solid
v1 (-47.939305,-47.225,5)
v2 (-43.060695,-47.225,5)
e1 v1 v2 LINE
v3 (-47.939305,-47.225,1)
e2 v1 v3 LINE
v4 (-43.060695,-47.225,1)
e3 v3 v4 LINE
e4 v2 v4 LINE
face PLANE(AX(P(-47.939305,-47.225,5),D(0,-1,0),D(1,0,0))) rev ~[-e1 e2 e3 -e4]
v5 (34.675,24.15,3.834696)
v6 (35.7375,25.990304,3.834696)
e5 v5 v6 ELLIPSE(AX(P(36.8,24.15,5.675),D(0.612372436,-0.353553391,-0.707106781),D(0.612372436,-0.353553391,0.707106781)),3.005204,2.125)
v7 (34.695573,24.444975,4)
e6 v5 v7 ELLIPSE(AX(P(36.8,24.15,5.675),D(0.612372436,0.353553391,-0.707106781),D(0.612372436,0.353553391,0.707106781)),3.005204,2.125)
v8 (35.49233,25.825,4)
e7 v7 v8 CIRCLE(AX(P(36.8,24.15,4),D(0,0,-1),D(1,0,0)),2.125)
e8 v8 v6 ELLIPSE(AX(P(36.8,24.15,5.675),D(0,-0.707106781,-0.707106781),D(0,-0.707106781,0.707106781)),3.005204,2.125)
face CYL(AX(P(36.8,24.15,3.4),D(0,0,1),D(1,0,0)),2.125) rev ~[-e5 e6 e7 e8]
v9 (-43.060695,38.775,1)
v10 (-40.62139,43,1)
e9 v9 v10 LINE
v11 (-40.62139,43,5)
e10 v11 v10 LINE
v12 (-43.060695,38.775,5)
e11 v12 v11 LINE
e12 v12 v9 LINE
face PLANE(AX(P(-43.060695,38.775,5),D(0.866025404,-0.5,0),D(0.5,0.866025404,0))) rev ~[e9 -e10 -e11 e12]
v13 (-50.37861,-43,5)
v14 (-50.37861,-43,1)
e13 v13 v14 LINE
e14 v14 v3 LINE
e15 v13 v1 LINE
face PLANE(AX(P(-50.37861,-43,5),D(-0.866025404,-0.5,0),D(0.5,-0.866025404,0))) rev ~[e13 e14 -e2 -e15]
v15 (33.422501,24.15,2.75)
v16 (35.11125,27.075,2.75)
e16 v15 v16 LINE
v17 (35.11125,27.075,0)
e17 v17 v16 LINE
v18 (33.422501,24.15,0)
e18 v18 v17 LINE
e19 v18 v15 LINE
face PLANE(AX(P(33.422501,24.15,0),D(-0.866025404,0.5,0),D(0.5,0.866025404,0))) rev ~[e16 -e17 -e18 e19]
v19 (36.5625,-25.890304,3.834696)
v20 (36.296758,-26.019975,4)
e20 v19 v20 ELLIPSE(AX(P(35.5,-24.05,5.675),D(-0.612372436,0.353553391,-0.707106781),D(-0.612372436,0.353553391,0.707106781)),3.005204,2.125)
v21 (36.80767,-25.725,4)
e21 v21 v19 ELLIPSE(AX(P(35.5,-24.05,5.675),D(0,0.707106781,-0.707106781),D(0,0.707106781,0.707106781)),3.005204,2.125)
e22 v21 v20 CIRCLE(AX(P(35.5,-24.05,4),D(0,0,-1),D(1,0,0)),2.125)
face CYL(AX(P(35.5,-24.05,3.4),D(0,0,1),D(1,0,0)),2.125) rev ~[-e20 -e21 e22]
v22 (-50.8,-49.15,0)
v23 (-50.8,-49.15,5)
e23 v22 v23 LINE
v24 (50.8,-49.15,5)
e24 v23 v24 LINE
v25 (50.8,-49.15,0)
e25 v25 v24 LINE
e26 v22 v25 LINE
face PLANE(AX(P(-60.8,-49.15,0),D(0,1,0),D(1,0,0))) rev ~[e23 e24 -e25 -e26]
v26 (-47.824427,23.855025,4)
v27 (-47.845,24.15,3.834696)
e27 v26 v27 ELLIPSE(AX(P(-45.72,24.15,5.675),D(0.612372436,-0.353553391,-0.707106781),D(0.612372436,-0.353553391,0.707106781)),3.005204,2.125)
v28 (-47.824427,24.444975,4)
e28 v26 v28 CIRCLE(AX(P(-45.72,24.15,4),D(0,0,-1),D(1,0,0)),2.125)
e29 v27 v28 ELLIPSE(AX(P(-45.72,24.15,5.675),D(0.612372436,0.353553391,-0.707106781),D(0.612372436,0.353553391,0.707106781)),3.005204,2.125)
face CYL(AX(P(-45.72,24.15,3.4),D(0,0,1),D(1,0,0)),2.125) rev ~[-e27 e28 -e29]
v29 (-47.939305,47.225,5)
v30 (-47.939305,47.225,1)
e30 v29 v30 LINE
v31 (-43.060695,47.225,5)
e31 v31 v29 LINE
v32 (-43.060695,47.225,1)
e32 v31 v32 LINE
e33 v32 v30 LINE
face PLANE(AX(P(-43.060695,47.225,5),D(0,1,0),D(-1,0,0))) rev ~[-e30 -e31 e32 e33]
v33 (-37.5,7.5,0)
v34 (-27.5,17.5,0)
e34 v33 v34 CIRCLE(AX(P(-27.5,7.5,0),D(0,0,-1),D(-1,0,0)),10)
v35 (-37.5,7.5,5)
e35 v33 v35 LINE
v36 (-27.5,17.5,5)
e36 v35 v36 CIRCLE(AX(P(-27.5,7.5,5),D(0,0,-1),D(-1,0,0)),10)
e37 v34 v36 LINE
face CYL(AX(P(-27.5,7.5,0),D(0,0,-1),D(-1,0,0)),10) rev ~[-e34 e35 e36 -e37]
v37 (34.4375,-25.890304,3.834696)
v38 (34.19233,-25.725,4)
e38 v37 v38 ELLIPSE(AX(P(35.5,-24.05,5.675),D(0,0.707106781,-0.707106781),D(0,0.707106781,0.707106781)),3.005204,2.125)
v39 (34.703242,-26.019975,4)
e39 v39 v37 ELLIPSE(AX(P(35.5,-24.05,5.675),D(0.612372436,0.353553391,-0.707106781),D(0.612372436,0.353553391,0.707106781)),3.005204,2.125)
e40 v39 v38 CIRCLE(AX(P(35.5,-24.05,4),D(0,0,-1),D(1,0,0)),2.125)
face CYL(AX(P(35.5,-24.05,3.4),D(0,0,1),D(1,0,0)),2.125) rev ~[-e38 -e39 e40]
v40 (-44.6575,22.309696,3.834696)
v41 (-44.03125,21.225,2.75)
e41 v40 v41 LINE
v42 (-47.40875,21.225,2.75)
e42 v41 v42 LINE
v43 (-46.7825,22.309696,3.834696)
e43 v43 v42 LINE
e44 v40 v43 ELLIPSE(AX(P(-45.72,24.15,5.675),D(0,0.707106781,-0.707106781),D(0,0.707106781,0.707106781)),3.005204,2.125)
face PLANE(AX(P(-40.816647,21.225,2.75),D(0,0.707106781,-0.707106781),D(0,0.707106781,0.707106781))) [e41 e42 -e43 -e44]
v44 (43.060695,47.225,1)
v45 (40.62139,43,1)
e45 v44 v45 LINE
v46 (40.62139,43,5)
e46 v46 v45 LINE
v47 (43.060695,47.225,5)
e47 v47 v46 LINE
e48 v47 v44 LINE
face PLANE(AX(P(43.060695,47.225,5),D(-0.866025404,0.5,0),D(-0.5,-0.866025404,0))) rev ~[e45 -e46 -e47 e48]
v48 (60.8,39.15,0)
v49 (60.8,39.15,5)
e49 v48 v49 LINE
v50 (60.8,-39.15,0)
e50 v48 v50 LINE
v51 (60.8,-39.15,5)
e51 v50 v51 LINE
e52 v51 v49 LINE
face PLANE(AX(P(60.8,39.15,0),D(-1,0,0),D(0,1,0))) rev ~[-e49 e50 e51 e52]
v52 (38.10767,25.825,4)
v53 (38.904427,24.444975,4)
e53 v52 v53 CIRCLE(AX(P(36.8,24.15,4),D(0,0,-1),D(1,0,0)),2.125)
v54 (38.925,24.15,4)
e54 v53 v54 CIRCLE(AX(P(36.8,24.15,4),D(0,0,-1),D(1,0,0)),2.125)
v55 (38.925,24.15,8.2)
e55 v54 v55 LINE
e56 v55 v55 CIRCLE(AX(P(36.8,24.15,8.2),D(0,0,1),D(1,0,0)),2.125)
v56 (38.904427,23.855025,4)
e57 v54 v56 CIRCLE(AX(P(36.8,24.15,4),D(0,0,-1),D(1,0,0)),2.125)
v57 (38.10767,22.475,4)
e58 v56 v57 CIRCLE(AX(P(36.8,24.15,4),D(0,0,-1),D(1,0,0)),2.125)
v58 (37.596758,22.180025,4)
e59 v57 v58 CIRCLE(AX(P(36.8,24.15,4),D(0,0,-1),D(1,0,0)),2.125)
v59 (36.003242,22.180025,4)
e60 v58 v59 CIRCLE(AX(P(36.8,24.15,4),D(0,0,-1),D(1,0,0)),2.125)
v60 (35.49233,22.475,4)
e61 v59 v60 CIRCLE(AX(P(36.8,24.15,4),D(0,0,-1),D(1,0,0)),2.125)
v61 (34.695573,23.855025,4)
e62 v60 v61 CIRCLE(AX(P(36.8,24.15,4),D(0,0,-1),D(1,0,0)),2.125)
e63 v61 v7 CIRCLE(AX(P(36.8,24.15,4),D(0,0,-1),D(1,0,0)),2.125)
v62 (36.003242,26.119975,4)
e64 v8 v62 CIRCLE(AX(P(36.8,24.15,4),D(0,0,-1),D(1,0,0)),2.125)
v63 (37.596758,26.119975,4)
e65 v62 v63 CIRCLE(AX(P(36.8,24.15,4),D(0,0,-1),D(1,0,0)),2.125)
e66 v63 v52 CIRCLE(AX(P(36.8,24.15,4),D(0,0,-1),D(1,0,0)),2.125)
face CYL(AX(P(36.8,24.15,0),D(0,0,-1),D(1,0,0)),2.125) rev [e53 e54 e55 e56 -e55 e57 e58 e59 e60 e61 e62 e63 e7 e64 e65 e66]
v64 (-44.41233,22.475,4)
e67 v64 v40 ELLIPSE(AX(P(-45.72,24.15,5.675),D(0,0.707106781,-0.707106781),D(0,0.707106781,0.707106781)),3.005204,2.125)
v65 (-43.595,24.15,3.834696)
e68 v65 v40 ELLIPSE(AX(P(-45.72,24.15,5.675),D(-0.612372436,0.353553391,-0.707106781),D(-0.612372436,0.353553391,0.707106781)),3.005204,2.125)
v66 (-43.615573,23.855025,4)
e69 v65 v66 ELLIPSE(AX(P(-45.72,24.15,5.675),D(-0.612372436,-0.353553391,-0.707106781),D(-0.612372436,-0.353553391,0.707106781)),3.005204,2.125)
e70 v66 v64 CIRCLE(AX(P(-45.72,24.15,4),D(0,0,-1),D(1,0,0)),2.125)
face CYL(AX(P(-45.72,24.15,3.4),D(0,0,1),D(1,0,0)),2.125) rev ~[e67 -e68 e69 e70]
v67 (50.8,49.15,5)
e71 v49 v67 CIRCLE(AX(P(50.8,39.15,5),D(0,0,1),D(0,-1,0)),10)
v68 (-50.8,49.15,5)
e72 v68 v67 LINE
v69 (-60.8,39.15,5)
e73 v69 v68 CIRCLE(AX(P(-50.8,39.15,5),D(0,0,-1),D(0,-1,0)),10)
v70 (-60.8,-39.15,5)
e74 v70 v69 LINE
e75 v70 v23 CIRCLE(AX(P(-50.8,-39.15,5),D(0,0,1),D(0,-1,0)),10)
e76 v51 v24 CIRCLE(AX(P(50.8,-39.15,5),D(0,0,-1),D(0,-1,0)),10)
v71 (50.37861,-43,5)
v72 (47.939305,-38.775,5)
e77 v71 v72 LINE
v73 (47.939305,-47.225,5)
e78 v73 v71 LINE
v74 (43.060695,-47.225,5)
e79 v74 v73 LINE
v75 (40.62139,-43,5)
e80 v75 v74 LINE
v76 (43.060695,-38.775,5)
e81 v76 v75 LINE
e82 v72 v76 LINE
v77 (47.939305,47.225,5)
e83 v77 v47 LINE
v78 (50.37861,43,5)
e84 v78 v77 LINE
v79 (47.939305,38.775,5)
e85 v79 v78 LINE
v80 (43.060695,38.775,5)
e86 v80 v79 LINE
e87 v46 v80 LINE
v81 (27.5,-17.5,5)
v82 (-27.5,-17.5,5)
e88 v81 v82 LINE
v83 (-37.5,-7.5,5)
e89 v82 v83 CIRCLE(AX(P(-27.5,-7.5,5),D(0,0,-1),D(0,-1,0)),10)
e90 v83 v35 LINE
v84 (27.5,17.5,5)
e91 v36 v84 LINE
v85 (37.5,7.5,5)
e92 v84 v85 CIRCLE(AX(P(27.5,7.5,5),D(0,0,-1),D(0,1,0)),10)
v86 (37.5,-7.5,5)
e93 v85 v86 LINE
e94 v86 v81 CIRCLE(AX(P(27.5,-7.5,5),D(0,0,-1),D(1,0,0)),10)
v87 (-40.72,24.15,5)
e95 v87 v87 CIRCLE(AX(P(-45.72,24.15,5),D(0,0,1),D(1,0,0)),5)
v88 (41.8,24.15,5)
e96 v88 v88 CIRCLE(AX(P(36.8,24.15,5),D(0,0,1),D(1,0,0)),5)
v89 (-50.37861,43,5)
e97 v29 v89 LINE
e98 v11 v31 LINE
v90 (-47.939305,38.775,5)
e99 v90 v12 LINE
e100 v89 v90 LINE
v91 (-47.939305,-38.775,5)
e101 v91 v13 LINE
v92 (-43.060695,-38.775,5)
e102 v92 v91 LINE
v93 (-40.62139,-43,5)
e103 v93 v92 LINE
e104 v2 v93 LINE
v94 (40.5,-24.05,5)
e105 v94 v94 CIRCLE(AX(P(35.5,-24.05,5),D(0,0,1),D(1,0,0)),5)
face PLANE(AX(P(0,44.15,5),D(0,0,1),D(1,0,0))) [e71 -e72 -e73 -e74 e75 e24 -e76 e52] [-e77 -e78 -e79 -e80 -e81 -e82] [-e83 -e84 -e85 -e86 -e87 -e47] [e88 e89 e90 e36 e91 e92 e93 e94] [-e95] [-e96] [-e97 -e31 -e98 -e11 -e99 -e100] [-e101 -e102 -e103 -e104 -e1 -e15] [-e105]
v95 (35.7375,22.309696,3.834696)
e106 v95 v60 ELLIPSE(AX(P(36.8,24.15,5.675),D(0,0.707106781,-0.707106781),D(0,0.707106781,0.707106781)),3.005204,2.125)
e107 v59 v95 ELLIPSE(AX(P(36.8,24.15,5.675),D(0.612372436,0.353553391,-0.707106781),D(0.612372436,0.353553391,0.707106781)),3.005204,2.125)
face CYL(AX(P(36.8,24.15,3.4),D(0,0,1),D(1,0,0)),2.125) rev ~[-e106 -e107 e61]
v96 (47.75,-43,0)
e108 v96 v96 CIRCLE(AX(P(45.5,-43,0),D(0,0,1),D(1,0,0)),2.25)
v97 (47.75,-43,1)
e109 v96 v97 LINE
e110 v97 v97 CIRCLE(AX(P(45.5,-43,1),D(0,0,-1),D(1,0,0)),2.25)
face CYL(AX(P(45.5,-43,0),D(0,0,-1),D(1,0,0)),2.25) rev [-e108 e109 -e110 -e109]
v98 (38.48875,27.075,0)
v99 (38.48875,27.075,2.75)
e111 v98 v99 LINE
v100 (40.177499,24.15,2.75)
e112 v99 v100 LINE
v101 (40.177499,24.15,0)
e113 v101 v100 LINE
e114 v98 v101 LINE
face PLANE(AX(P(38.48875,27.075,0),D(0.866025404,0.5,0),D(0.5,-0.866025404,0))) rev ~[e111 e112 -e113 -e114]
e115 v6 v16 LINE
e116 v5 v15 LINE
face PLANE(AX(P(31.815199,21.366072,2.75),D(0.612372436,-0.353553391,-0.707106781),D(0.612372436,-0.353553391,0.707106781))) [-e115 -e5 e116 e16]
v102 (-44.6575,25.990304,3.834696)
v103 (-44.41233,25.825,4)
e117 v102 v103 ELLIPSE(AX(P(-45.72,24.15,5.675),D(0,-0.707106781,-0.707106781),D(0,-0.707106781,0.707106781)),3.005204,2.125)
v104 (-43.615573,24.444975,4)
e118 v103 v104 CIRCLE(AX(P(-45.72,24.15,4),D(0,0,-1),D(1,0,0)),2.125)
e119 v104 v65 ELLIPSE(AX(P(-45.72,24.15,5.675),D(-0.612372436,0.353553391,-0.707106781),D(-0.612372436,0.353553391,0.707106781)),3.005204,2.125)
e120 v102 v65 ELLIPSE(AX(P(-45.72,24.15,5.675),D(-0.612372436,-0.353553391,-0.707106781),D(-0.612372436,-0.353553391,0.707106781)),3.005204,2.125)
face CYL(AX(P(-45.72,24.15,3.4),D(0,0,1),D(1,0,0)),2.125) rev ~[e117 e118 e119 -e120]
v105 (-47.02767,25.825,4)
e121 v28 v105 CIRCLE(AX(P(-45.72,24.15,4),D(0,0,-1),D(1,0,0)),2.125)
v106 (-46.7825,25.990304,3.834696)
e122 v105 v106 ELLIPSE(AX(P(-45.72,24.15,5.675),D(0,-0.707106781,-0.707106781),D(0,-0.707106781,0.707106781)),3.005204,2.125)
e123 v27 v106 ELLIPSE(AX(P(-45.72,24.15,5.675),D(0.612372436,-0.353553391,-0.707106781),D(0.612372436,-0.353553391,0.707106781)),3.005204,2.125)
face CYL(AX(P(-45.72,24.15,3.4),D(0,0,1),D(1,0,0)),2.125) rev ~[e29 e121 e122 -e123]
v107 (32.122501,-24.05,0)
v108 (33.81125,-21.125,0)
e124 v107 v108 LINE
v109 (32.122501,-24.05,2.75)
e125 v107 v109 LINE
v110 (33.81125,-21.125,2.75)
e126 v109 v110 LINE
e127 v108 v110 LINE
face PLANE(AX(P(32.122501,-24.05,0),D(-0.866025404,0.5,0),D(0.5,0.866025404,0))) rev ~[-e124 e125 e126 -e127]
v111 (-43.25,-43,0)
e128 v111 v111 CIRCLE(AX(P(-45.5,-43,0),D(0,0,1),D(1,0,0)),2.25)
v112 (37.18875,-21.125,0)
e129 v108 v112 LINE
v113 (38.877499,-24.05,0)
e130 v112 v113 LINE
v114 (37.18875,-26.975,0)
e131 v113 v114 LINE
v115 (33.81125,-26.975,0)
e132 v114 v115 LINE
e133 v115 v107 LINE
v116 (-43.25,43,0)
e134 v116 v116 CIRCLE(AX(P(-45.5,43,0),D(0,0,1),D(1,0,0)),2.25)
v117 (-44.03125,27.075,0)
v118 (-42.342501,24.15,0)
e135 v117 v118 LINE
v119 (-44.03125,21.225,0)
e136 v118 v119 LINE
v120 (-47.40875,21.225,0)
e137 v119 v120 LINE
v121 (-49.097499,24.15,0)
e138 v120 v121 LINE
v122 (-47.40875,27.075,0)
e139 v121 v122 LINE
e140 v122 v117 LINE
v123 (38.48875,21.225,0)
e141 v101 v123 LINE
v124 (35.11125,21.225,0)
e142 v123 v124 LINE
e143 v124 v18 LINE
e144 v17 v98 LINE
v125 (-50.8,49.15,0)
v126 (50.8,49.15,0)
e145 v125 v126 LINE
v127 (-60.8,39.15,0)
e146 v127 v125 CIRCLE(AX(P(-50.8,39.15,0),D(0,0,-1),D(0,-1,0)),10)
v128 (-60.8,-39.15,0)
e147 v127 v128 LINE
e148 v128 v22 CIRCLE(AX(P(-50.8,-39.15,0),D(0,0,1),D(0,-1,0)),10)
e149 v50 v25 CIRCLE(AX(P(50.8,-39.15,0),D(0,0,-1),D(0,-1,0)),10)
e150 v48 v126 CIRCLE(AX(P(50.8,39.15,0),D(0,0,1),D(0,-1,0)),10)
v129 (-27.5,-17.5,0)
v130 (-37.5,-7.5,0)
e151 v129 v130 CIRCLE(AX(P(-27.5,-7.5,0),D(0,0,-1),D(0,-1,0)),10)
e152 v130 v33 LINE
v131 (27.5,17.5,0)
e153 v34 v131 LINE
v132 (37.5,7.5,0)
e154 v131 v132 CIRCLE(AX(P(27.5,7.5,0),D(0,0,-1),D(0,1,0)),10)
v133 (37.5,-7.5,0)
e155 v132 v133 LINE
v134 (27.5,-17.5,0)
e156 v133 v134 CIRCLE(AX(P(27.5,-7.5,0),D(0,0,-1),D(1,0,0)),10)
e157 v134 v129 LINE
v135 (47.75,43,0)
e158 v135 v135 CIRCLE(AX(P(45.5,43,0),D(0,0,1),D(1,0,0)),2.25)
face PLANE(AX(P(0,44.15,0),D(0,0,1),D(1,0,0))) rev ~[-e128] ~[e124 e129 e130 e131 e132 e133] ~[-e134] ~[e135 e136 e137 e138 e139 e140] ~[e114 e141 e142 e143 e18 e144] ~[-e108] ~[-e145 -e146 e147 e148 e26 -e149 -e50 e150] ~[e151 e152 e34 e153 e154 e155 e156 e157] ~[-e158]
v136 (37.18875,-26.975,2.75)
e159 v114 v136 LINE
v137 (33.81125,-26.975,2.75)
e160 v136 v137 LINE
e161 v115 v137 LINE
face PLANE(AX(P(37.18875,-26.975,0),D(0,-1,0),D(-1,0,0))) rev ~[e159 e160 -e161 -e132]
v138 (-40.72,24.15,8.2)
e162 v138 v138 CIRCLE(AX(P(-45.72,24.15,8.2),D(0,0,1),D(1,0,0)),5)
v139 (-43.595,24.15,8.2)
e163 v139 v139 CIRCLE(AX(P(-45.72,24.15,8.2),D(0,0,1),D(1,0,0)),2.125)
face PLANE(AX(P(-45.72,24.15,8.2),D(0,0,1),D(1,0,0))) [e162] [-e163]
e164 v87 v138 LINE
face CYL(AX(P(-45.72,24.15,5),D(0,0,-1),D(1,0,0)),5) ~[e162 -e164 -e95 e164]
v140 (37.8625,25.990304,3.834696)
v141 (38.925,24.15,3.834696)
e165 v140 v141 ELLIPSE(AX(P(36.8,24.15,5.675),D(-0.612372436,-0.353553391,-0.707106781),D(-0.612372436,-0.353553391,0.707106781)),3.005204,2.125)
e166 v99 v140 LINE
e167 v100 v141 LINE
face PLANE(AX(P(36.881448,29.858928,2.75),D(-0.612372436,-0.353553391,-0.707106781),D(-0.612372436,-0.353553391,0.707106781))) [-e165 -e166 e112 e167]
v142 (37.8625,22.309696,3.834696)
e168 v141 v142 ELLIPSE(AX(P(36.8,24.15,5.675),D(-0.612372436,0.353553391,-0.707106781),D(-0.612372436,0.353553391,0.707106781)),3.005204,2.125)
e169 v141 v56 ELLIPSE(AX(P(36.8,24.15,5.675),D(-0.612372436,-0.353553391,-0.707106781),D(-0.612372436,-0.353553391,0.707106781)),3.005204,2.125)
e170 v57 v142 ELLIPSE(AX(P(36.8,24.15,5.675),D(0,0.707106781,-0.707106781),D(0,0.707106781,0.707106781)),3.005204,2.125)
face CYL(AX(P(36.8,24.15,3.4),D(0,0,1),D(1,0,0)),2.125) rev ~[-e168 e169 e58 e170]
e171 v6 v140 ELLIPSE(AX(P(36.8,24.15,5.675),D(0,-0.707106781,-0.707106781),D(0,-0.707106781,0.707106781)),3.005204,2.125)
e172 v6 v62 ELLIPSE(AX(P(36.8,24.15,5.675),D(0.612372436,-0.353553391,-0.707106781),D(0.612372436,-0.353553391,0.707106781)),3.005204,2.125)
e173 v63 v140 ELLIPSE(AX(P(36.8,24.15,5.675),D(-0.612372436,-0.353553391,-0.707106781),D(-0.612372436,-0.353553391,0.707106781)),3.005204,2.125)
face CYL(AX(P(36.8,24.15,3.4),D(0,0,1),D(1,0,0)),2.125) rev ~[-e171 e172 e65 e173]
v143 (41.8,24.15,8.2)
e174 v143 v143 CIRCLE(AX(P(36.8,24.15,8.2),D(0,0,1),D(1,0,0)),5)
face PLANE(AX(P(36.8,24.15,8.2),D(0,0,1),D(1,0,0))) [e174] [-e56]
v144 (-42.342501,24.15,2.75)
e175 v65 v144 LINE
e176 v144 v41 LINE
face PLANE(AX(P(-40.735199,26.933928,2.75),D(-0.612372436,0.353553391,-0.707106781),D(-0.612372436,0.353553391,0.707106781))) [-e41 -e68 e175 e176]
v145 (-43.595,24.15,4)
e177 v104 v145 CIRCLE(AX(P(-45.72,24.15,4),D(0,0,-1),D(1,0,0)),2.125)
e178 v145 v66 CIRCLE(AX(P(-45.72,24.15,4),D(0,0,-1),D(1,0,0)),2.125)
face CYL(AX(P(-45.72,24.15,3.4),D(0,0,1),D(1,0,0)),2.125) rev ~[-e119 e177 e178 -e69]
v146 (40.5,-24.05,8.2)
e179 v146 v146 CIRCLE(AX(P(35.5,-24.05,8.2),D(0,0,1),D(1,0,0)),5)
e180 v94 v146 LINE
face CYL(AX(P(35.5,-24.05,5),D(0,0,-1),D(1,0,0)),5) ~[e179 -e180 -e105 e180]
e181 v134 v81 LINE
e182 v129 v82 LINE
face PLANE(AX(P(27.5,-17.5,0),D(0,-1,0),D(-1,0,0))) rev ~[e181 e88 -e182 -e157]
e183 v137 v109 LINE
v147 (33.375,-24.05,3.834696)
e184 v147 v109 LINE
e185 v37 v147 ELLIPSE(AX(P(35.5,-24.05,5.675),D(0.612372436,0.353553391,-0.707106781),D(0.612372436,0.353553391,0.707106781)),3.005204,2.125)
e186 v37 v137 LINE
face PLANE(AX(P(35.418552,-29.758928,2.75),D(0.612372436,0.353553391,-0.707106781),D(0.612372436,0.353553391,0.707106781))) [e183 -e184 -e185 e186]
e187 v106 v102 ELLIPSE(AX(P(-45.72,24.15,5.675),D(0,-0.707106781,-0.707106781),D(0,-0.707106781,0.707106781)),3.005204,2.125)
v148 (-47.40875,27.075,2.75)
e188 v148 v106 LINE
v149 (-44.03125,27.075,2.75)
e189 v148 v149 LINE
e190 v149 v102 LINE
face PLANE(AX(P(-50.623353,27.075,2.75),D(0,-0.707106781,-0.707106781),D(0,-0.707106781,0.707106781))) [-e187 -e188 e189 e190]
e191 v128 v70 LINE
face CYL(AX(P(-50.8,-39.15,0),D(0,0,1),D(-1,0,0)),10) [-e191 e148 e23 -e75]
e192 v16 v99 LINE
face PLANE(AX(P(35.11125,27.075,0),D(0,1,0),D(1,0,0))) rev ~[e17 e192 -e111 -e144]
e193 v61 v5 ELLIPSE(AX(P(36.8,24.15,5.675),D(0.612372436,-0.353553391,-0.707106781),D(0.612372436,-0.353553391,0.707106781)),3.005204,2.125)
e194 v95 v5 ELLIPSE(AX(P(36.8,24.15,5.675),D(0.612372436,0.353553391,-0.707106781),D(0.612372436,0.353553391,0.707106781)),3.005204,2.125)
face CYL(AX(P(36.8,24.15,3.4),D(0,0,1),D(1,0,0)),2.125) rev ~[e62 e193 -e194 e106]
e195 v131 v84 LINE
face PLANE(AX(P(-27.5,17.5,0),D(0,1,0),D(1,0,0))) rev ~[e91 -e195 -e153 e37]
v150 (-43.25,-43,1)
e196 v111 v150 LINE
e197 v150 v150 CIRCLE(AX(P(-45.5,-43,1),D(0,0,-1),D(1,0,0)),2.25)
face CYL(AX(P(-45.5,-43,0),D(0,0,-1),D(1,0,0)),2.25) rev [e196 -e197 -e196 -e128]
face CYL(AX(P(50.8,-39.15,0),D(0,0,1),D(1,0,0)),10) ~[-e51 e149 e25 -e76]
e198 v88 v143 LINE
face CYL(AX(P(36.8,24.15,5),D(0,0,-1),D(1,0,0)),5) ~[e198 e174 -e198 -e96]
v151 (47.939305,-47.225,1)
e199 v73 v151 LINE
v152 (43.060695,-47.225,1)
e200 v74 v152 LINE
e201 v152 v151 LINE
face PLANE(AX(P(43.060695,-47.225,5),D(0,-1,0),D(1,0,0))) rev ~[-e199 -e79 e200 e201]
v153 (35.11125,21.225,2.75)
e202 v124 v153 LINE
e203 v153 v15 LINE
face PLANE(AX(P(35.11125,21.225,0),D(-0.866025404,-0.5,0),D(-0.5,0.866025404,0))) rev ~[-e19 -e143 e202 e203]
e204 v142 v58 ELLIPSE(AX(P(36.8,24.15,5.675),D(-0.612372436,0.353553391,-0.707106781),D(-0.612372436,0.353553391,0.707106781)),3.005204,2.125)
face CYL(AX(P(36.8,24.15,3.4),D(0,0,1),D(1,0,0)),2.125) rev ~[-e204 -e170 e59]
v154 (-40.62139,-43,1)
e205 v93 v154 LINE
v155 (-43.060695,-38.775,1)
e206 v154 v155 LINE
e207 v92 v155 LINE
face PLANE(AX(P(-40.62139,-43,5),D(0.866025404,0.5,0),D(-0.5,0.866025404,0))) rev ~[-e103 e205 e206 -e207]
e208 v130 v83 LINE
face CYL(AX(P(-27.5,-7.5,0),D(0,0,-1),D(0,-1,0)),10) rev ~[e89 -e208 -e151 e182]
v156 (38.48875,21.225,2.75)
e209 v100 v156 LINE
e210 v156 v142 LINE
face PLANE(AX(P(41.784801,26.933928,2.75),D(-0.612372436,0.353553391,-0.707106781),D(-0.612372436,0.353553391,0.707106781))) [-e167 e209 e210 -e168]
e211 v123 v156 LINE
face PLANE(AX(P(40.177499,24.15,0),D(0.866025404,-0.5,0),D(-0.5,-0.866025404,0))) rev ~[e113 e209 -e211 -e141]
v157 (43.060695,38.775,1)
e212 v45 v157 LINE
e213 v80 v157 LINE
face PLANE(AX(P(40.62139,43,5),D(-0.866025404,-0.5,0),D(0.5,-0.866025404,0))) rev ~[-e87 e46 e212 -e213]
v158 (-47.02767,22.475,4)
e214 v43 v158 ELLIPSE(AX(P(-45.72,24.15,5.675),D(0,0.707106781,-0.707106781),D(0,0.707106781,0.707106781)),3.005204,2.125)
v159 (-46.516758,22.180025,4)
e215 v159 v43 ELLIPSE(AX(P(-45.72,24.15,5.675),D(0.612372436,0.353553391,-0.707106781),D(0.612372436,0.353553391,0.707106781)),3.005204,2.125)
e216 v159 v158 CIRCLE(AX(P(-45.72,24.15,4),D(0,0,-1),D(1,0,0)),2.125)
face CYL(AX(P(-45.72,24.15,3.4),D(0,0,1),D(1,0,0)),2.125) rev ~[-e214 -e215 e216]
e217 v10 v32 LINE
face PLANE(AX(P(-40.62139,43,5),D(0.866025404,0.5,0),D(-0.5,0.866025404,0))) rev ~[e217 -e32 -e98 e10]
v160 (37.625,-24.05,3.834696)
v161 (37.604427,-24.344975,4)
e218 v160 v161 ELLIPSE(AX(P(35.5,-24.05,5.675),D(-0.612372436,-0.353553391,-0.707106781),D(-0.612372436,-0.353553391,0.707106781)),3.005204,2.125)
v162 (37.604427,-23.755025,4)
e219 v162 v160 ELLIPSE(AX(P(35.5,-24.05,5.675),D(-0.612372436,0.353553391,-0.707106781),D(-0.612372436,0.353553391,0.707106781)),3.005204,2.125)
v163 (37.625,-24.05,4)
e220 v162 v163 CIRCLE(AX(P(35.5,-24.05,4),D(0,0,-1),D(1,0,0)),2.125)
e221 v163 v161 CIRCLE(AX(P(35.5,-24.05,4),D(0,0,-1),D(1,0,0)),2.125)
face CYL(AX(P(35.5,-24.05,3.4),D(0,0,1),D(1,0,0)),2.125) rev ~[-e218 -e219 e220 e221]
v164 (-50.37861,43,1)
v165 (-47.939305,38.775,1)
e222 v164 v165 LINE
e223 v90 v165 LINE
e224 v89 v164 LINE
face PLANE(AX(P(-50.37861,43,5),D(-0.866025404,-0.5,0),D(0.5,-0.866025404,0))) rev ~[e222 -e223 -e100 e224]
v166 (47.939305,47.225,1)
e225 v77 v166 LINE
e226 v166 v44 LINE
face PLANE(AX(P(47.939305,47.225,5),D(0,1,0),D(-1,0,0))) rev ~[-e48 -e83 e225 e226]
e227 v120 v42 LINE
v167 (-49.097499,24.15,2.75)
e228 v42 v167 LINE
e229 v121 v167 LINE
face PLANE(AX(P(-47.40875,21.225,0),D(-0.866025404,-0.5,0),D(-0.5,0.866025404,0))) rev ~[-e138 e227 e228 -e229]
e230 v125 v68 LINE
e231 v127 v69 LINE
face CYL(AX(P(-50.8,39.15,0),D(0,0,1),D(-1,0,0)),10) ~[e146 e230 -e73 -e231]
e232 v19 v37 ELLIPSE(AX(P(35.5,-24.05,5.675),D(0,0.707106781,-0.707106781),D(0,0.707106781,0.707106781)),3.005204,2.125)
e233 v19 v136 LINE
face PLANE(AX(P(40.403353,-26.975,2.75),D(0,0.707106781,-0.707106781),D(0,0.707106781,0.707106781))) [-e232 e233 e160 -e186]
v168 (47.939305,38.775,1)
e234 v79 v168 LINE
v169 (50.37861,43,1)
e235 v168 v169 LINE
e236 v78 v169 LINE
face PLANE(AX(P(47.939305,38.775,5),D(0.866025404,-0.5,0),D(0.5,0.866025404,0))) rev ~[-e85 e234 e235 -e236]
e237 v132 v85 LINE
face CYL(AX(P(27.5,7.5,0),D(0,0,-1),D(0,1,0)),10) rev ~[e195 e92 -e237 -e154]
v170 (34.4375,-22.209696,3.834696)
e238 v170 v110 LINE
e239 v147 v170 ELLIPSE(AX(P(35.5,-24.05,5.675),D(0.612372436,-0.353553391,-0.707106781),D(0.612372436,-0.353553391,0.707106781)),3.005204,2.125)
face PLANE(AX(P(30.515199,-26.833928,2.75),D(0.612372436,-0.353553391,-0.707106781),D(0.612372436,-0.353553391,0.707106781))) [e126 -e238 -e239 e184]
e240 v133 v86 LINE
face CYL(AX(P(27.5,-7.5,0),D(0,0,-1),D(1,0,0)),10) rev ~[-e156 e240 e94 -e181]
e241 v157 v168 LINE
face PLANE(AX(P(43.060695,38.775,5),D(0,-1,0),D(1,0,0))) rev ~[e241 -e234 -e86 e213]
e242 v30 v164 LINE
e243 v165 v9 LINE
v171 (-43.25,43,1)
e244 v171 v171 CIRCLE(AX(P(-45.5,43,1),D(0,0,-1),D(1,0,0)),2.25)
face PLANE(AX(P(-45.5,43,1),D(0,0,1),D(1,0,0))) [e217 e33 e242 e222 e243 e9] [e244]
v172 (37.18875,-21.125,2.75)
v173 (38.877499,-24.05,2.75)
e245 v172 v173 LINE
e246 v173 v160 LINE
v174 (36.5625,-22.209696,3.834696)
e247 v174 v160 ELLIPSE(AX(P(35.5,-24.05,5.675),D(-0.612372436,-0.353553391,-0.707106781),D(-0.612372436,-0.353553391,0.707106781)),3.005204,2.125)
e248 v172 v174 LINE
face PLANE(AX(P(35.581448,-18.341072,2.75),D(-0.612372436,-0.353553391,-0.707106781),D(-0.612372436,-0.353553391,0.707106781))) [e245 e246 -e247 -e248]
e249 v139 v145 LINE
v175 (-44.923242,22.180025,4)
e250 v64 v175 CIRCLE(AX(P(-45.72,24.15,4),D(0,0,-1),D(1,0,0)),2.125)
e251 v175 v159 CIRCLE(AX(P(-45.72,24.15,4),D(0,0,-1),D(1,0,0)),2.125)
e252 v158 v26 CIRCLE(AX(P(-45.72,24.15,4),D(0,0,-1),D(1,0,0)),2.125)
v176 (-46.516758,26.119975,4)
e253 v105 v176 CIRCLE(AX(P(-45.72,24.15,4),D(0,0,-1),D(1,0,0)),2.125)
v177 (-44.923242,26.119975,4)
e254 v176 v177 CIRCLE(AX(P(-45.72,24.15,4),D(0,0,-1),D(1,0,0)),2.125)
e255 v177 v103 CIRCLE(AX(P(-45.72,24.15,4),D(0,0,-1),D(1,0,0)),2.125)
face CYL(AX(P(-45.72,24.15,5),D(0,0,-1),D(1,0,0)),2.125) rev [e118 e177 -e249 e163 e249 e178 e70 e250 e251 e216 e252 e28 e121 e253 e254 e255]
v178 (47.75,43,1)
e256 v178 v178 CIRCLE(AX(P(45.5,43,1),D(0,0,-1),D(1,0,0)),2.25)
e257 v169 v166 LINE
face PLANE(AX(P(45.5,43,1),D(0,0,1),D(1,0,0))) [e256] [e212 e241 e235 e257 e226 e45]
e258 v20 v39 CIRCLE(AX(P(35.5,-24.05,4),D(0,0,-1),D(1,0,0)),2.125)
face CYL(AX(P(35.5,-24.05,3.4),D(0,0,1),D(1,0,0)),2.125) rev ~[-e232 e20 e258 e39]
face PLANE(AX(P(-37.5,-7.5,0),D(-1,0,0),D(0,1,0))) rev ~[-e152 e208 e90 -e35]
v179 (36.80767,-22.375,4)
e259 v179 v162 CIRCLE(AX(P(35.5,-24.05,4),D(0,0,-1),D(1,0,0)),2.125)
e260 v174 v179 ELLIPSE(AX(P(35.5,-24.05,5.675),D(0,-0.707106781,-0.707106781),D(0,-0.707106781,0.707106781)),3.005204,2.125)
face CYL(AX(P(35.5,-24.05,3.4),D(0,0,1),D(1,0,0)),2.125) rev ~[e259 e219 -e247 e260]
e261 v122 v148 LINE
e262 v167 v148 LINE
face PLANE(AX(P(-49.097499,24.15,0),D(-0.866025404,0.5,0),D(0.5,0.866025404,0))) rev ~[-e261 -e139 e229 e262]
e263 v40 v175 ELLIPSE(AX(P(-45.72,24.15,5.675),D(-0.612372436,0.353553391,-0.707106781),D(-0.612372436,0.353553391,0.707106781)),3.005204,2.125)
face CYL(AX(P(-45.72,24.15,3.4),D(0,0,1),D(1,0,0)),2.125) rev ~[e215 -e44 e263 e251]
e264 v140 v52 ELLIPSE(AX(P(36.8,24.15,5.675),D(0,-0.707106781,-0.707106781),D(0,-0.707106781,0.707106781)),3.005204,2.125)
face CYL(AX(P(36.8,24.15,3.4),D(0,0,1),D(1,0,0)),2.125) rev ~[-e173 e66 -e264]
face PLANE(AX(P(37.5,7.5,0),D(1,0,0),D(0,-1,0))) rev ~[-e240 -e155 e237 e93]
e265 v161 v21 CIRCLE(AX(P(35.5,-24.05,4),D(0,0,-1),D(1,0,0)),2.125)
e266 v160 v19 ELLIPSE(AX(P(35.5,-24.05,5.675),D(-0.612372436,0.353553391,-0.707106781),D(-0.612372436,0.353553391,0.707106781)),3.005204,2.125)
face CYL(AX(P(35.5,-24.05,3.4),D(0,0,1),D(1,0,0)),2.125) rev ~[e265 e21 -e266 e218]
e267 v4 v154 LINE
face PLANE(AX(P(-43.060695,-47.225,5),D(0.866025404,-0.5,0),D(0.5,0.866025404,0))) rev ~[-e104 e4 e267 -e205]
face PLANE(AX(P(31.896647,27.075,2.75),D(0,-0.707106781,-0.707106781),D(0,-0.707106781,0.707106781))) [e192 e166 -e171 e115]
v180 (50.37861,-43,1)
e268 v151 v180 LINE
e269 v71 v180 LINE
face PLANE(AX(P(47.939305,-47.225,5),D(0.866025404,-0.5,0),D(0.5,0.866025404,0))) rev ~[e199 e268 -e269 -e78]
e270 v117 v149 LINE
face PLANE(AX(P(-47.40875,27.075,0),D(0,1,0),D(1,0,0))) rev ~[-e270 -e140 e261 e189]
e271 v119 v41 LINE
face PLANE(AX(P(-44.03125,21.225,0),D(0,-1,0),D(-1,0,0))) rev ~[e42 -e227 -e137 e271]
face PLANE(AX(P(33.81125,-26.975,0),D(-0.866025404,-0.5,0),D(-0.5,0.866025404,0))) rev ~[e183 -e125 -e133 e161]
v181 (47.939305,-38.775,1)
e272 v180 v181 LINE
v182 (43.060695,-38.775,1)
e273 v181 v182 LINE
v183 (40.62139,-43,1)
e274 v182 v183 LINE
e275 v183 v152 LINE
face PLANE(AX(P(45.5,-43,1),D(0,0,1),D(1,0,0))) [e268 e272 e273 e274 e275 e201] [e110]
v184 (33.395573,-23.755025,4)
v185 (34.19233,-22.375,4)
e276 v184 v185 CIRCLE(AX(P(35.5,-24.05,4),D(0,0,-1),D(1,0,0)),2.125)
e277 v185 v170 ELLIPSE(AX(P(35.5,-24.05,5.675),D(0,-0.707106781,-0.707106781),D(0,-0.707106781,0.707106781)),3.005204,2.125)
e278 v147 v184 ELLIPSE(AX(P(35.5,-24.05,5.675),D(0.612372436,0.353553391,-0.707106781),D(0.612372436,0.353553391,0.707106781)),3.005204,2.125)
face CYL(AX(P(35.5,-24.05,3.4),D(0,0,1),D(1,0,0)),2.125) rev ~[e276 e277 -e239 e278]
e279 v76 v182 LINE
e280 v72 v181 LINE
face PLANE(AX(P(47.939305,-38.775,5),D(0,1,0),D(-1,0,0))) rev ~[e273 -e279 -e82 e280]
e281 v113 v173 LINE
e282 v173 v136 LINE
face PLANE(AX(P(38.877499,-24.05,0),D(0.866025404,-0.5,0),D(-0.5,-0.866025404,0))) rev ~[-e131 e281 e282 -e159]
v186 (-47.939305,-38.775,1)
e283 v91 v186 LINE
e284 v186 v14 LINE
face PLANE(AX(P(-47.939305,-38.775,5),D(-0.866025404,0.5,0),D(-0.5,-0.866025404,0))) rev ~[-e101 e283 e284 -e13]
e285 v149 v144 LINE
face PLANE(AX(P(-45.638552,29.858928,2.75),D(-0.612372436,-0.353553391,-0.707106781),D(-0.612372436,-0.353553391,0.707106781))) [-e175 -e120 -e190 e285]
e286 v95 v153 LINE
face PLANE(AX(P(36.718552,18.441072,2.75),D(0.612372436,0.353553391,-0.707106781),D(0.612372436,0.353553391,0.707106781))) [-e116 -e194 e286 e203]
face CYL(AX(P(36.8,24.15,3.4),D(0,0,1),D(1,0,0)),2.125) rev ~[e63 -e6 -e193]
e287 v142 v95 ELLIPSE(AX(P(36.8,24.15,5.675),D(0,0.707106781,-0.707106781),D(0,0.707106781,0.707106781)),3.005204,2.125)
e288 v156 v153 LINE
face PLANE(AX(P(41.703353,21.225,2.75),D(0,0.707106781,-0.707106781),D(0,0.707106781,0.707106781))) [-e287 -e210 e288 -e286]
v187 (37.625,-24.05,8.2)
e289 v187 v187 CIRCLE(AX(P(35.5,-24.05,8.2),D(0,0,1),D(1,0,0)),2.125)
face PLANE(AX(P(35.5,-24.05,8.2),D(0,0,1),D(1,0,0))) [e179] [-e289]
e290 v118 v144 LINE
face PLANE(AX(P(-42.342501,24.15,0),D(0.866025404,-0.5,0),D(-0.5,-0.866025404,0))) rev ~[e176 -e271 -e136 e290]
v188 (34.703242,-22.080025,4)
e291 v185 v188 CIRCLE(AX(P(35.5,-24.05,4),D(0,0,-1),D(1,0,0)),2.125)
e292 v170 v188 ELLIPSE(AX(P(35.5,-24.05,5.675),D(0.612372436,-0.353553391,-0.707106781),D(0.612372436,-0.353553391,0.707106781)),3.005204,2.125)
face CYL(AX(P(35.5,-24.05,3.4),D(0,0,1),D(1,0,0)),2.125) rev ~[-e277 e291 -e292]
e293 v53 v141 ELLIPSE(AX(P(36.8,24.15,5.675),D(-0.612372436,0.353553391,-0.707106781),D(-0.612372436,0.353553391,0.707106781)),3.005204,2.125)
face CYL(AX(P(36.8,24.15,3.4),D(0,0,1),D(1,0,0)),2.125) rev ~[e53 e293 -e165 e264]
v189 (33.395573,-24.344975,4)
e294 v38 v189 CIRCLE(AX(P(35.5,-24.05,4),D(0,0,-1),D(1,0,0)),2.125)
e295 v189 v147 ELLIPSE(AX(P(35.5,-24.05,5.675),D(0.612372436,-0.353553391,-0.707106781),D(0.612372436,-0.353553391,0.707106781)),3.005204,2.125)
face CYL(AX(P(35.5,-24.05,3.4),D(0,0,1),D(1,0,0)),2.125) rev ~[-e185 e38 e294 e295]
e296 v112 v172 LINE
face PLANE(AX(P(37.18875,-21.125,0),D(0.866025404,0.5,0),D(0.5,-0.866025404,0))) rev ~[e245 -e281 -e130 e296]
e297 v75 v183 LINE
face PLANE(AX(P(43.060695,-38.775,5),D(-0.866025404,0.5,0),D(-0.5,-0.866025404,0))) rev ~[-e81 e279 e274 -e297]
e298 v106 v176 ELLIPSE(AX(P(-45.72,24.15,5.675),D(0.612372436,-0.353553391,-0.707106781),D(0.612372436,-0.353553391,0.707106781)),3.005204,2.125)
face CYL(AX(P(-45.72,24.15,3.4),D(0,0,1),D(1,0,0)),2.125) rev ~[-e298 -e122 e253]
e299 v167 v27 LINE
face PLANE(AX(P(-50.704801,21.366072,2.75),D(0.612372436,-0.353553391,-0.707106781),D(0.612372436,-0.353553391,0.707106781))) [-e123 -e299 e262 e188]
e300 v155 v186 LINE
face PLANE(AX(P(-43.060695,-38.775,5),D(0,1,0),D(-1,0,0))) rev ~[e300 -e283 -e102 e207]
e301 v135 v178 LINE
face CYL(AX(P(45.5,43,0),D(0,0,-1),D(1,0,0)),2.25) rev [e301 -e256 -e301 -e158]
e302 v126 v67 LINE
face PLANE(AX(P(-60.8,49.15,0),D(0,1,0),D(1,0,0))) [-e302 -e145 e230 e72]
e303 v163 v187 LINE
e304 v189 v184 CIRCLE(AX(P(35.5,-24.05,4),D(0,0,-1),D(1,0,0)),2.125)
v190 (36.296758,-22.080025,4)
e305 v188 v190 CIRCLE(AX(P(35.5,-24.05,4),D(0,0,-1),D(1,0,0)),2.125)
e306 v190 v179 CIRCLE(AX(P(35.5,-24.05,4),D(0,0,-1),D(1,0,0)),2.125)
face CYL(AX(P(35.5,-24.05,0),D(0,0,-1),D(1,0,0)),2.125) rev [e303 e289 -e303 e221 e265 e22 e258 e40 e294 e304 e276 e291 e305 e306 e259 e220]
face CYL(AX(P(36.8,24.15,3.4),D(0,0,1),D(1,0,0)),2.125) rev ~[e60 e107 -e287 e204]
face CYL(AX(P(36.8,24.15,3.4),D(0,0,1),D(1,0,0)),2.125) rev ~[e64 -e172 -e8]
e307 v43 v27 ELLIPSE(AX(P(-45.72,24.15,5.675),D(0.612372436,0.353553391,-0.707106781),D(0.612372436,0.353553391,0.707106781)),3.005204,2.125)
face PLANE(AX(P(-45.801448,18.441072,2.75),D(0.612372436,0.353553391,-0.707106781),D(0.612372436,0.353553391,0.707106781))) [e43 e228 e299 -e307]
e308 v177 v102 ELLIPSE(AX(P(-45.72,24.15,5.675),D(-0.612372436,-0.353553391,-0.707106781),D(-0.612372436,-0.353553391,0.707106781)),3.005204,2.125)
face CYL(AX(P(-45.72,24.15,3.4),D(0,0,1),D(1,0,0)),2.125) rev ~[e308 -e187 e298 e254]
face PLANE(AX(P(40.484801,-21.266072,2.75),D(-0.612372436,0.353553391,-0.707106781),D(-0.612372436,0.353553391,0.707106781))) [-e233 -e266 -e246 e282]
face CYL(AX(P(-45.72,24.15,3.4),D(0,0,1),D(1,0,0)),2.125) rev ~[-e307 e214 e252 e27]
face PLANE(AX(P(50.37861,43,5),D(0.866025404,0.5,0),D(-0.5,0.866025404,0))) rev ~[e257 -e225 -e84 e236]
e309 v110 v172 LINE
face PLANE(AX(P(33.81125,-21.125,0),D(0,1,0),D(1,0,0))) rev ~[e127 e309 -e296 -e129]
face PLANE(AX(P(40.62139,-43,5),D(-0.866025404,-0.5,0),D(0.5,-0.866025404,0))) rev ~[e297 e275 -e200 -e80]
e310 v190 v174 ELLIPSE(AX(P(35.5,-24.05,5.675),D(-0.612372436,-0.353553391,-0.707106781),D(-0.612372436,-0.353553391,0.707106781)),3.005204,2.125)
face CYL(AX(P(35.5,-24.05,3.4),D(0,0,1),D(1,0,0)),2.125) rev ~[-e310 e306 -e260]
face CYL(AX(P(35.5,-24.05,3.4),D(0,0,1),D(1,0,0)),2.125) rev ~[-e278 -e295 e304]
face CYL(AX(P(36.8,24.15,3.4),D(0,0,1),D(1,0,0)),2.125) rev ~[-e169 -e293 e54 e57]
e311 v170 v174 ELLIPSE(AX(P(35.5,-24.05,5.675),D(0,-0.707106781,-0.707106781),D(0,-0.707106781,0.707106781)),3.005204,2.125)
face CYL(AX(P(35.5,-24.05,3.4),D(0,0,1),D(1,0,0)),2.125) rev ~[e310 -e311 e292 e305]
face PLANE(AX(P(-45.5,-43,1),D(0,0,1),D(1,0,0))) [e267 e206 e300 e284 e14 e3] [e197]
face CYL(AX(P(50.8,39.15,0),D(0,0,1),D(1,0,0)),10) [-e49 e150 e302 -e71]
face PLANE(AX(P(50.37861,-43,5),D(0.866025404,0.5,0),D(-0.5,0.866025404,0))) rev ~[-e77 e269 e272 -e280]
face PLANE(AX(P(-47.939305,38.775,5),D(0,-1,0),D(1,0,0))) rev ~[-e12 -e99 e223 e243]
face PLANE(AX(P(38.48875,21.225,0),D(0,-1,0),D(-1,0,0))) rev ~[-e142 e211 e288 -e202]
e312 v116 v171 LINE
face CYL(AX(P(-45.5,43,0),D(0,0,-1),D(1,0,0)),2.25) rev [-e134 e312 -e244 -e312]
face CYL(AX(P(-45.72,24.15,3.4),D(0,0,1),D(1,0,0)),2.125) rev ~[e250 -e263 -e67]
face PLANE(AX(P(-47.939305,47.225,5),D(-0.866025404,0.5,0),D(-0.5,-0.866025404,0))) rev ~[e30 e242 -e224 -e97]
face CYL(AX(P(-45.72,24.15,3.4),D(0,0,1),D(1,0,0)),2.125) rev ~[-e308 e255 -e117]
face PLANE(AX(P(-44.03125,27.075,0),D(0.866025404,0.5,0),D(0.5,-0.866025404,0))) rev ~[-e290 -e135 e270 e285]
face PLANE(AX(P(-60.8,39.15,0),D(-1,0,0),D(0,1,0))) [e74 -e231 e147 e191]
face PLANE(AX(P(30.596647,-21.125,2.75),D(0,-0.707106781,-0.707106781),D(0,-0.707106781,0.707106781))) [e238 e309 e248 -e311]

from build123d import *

# Parameters (mm, degrees)
F0_W         = 121.6
F0_H         = 78.3
F0_R         = 2.125
F1_DEPTH     = 5
F2_R         = 5
F2_R_2       = 2.125
F3_DEPTH     = 3.2
F5_DEPTH     = 4
F6_W         = 121.6
F6_H         = 10
F6_R         = 2.25
F7_DEPTH     = 5
F8_R         = 10
F9_T3_DEPTH  = 9.8067065447
F9_S4_R      = 2.125
F9_T5_DEPTH  = 7
F9_T8_DEPTH  = 9.8067065447
F9_S9_R      = 2.125
F9_T10_DEPTH = 6
F9_T13_DEPTH = 9.8067065447
F9_S14_R     = 2.125
F9_T15_DEPTH = 7
F9_T18_DEPTH = 9.8067065447
F9_S19_R     = 2.125
F9_T20_DEPTH = 7
F9_T23_DEPTH = 9.8067065447
F9_S24_R     = 2.125
F9_T25_DEPTH = 7
F9_T28_DEPTH = 9.8067065447
F9_S29_R     = 2.125
F9_T30_DEPTH = 6
F9_T33_DEPTH = 9.8067065447
F9_S34_R     = 2.125
F9_T35_DEPTH = 6
F9_T38_DEPTH = 9.8067065447
F9_S39_R     = 2.125
F9_T40_DEPTH = 7
F9_T43_DEPTH = 9.8067065447
F9_S44_R     = 2.125
F9_T45_DEPTH = 7
F9_T48_DEPTH = 9.8067065447
F9_S49_R     = 2.125
F9_T50_DEPTH = 7
F9_T53_DEPTH = 9.8067065447
F9_S54_R     = 2.125
F9_T55_DEPTH = 7
F9_T58_DEPTH = 9.8067065447
F9_S59_R     = 2.125
F9_T60_DEPTH = 6
F9_T63_DEPTH = 9.8067065447
F9_S64_R     = 2.125
F9_T65_DEPTH = 7
F9_T68_DEPTH = 9.8067065447
F9_S69_R     = 2.125
F9_T70_DEPTH = 6
F9_T73_DEPTH = 9.8067065447
F9_S74_R     = 2.125
F9_T75_DEPTH = 7
F9_T78_DEPTH = 9.8067065447
F9_S79_R     = 2.125
F9_T80_DEPTH = 7
F9_T83_DEPTH = 9.8067065447
F9_S84_R     = 2.125
F9_T85_DEPTH = 6
F9_T88_DEPTH = 9.8067065447
F9_S89_R     = 2.125
F9_T90_DEPTH = 7
F11_DEPTH    = 4


# Not quite as in the source:
# - a fillet or chamfer that OpenCascade refuses, or shapes differently, is made with other operations: its cross-section is extruded or revolved along the edge and cut away or added


with BuildPart() as f1:
    # F0 (on Top) → F1 (new body)
    with BuildSketch(Plane.XY):
        Rectangle(F0_W, F0_H)
        with Locations((35.5, -24.05)):
            Circle(F0_R, mode=Mode.SUBTRACT)
        with BuildLine():
            ThreePointArc((37.5, -7.5), (34.5710678119, -14.5710678119), (27.5, -17.5))
            Line((27.5, -17.5), (-27.5, -17.5))
            ThreePointArc((-27.5, -17.5), (-34.5710678119, -14.5710678119), (-37.5, -7.5))
            Line((-37.5, -7.5), (-37.5, 7.5))
            ThreePointArc((-37.5, 7.5), (-34.5710678119, 14.5710678119), (-27.5, 17.5))
            Line((-27.5, 17.5), (27.5, 17.5))
            ThreePointArc((27.5, 17.5), (34.5710678119, 14.5710678119), (37.5, 7.5))
            Line((37.5, 7.5), (37.5, -7.5))
        make_face(mode=Mode.SUBTRACT)
        with Locations((-45.72, 24.15)):
            Circle(F0_R, mode=Mode.SUBTRACT)
        with Locations((36.8, 24.15)):
            Circle(F0_R, mode=Mode.SUBTRACT)
    extrude(amount=F1_DEPTH)

    # F2 (on face) → F3 (join)
    with BuildSketch(Plane.XY.offset(5)):
        with Locations((-45.72, 24.15)):
            Circle(F2_R)
        with Locations((-45.72, 24.15)):
            Circle(F2_R_2, mode=Mode.SUBTRACT)
        with Locations((36.8, 24.15)):
            Circle(F2_R)
        with Locations((36.8, 24.15)):
            Circle(F2_R_2, mode=Mode.SUBTRACT)
        with Locations((35.5, -24.05)):
            Circle(F2_R)
        with Locations((35.5, -24.05)):
            Circle(F2_R_2, mode=Mode.SUBTRACT)
    extrude(amount=F3_DEPTH)

    # F4 (on face) → F5 (cut)
    with BuildSketch(Plane(origin=(0, 0, 0), x_dir=(1, 0, 0), z_dir=(0, 0, -1))):
        Polygon((-44.0312504626, -21.225), (-47.4087495374, -21.225), (-49.0974990748, -24.15), (-47.4087495374, -27.075), (-44.0312504626, -27.075), (-42.3425009252, -24.15), align=None)
        Polygon((38.4887495374, -21.225), (35.1112504626, -21.225), (33.4225009252, -24.15), (35.1112504626, -27.075), (38.4887495374, -27.075), (40.1774990748, -24.15), align=None)
        Polygon((33.8112504626, 21.125), (37.1887495374, 21.125), (38.8774990748, 24.05), (37.1887495374, 26.975), (33.8112504626, 26.975), (32.1225009252, 24.05), align=None)
    extrude(amount=-F5_DEPTH, mode=Mode.SUBTRACT)

    # F6 (on Top) → F7 (join)
    with BuildSketch(Plane.XY):
        with Locations((0, 44.15)):
            Rectangle(F6_W, F6_H)
        with Locations((-45.5, 43)):
            Circle(F6_R, mode=Mode.SUBTRACT)
        with Locations((45.5, 43)):
            Circle(F6_R, mode=Mode.SUBTRACT)
        with Locations((0, -44.15)):
            Rectangle(F6_W, F6_H)
        with Locations((-45.5, -43)):
            Circle(F6_R, mode=Mode.SUBTRACT)
        with Locations((45.5, -43)):
            Circle(F6_R, mode=Mode.SUBTRACT)
    extrude(amount=F7_DEPTH)

    # F8
    f8_edges = [f1.edges().sort_by_distance(p)[0] for p in [
        (-60.8, 49.15, 2.5),
        (60.8, 49.15, 2.5),
        (-60.8, -49.15, 2.5),
        (60.8, -49.15, 2.5),
    ]]
    fillet(f8_edges, radius=F8_R)

    # F9: chamfer of 1.25 on 18 edges, made by hand


with BuildPart() as f9_tool1:
    # F9_s2 → F9_t3 (new body)
    with BuildSketch(Plane(origin=(0.9127211557, 1.5808794147, 0), x_dir=(0, 0, 1), z_dir=(-0.5, -0.8660254038, 0))):
        Polygon((2.75, -45.6939018343), (4, -44.4439018343), (4, -45.6939018343), align=None)
    extrude(amount=F9_T3_DEPTH)

    # F9_s4 → F9_t5 (cut, symmetric)
    with BuildSketch(Plane.XY.offset(3.4)):
        with Locations((35.5, -24.05)):
            Circle(F9_S4_R)
    extrude(amount=F9_T5_DEPTH, both=True, mode=Mode.SUBTRACT)


with BuildPart() as f9_tool6:
    # F9_s7 → F9_t8 (new body)
    with BuildSketch(Plane.YZ.offset(40.4033532723)):
        Polygon((-26.975, 2.75), (-25.725, 4), (-26.975, 4), align=None)
    extrude(amount=-F9_T8_DEPTH)

    # F9_s9 → F9_t10 (cut, symmetric)
    with BuildSketch(Plane.XY.offset(3.4)):
        with Locations((35.5, -24.05)):
            Circle(F9_S9_R)
    extrude(amount=F9_T10_DEPTH, both=True, mode=Mode.SUBTRACT)


with BuildPart() as f9_tool11:
    # F9_s12 → F9_t13 (new body)
    with BuildSketch(Plane(origin=(21.7406321167, -37.6558794147, 0), x_dir=(0, 0, 1), z_dir=(-0.5, 0.8660254038, 0))):
        Polygon((2.75, 15.7939018343), (4, 17.0439018343), (4, 15.7939018343), align=None)
    extrude(amount=F9_T13_DEPTH)

    # F9_s14 → F9_t15 (cut, symmetric)
    with BuildSketch(Plane.XY.offset(3.4)):
        with Locations((35.5, -24.05)):
            Circle(F9_S14_R)
    extrude(amount=F9_T15_DEPTH, both=True, mode=Mode.SUBTRACT)


with BuildPart() as f9_tool16:
    # F9_s17 → F9_t18 (new body)
    with BuildSketch(Plane(origin=(-3.9906321167, -6.9119775804, 0), x_dir=(0, 0, 1), z_dir=(0.5, 0.8660254038, 0))):
        Polygon((2.75, 39.8439018343), (4, 41.0939018343), (4, 39.8439018343), align=None)
    extrude(amount=F9_T18_DEPTH)

    # F9_s19 → F9_t20 (cut, symmetric)
    with BuildSketch(Plane.XY.offset(3.4)):
        with Locations((35.5, -24.05)):
            Circle(F9_S19_R)
    extrude(amount=F9_T20_DEPTH, both=True, mode=Mode.SUBTRACT)


with BuildPart() as f9_tool21:
    # F9_s22 → F9_t23 (new body)
    with BuildSketch(Plane(origin=(16.8372788443, -29.1630224196, 0), x_dir=(0, 0, 1), z_dir=(0.5, -0.8660254038, 0))):
        Polygon((2.75, -21.6439018343), (4, -20.3939018343), (4, -21.6439018343), align=None)
    extrude(amount=F9_T23_DEPTH)

    # F9_s24 → F9_t25 (cut, symmetric)
    with BuildSketch(Plane.XY.offset(3.4)):
        with Locations((35.5, -24.05)):
            Circle(F9_S24_R)
    extrude(amount=F9_T25_DEPTH, both=True, mode=Mode.SUBTRACT)


with BuildPart() as f9_tool26:
    # F9_s27 → F9_t28 (new body)
    with BuildSketch(Plane.YZ.offset(30.5966467277)):
        Polygon((-21.125, 2.75), (-22.375, 4), (-21.125, 4), align=None)
    extrude(amount=F9_T28_DEPTH)

    # F9_s29 → F9_t30 (cut, symmetric)
    with BuildSketch(Plane.XY.offset(3.4)):
        with Locations((35.5, -24.05)):
            Circle(F9_S29_R)
    extrude(amount=F9_T30_DEPTH, both=True, mode=Mode.SUBTRACT)


with BuildPart() as f9_tool31:
    # F9_s32 → F9_t33 (new body)
    with BuildSketch(Plane.YZ.offset(41.7033532723)):
        Polygon((21.225, 2.75), (22.475, 4), (21.225, 4), align=None)
    extrude(amount=-F9_T33_DEPTH)

    # F9_s34 → F9_t35 (cut, symmetric)
    with BuildSketch(Plane.XY.offset(3.4)):
        with Locations((36.8, 24.15)):
            Circle(F9_S34_R)
    extrude(amount=F9_T35_DEPTH, both=True, mode=Mode.SUBTRACT)


with BuildPart() as f9_tool36:
    # F9_s37 → F9_t38 (new body)
    with BuildSketch(Plane(origin=(1.1944198855, -2.0687959272, 0), x_dir=(0, 0, 1), z_dir=(-0.5, 0.8660254038, 0))):
        Polygon((2.75, 41.0197348593), (4, 42.2697348593), (4, 41.0197348593), align=None)
    extrude(amount=F9_T38_DEPTH)

    # F9_s39 → F9_t40 (cut, symmetric)
    with BuildSketch(Plane.XY.offset(3.4)):
        with Locations((36.8, 24.15)):
            Circle(F9_S39_R)
    extrude(amount=F9_T40_DEPTH, both=True, mode=Mode.SUBTRACT)


with BuildPart() as f9_tool41:
    # F9_s42 → F9_t43 (new body)
    with BuildSketch(Plane(origin=(17.2055801145, 29.8009389321, 0), x_dir=(0, 0, 1), z_dir=(0.5, 0.8660254038, 0))):
        Polygon((2.75, 16.8697348593), (4, 18.1197348593), (4, 16.8697348593), align=None)
    extrude(amount=F9_T43_DEPTH)

    # F9_s44 → F9_t45 (cut, symmetric)
    with BuildSketch(Plane.XY.offset(3.4)):
        with Locations((36.8, 24.15)):
            Circle(F9_S44_R)
    extrude(amount=F9_T45_DEPTH, both=True, mode=Mode.SUBTRACT)


with BuildPart() as f9_tool46:
    # F9_s47 → F9_t48 (new body)
    with BuildSketch(Plane(origin=(22.1089333869, 38.2937959272, 0), x_dir=(0, 0, 1), z_dir=(-0.5, -0.8660254038, 0))):
        Polygon((2.75, -22.7197348593), (4, -21.4697348593), (4, -22.7197348593), align=None)
    extrude(amount=F9_T48_DEPTH)

    # F9_s49 → F9_t50 (cut, symmetric)
    with BuildSketch(Plane.XY.offset(3.4)):
        with Locations((36.8, 24.15)):
            Circle(F9_S49_R)
    extrude(amount=F9_T50_DEPTH, both=True, mode=Mode.SUBTRACT)


with BuildPart() as f9_tool51:
    # F9_s52 → F9_t53 (new body)
    with BuildSketch(Plane(origin=(-3.7089333869, 6.4240610679, 0), x_dir=(0, 0, 1), z_dir=(0.5, -0.8660254038, 0))):
        Polygon((2.75, -46.8697348593), (4, -45.6197348593), (4, -46.8697348593), align=None)
    extrude(amount=F9_T53_DEPTH)

    # F9_s54 → F9_t55 (cut, symmetric)
    with BuildSketch(Plane.XY.offset(3.4)):
        with Locations((36.8, 24.15)):
            Circle(F9_S54_R)
    extrude(amount=F9_T55_DEPTH, both=True, mode=Mode.SUBTRACT)


with BuildPart() as f9_tool56:
    # F9_s57 → F9_t58 (new body)
    with BuildSketch(Plane.YZ.offset(31.8966467277)):
        Polygon((27.075, 2.75), (25.825, 4), (27.075, 4), align=None)
    extrude(amount=F9_T58_DEPTH)

    # F9_s59 → F9_t60 (cut, symmetric)
    with BuildSketch(Plane.XY.offset(3.4)):
        with Locations((36.8, 24.15)):
            Circle(F9_S59_R)
    extrude(amount=F9_T60_DEPTH, both=True, mode=Mode.SUBTRACT)


with BuildPart() as f9_tool61:
    # F9_s62 → F9_t63 (new body)
    with BuildSketch(Plane(origin=(-24.3389333869, 42.1562692281, 0), x_dir=(0, 0, 1), z_dir=(0.5, -0.8660254038, 0))):
        Polygon((2.75, 24.594681461), (4, 25.844681461), (4, 24.594681461), align=None)
    extrude(amount=F9_T63_DEPTH)

    # F9_s64 → F9_t65 (cut, symmetric)
    with BuildSketch(Plane.XY.offset(3.4)):
        with Locations((-45.72, 24.15)):
            Circle(F9_S64_R)
    extrude(amount=F9_T65_DEPTH, both=True, mode=Mode.SUBTRACT)


with BuildPart() as f9_tool66:
    # F9_s67 → F9_t68 (new body)
    with BuildSketch(Plane.YZ.offset(-50.6233532723)):
        Polygon((27.075, 2.75), (25.825, 4), (27.075, 4), align=None)
    extrude(amount=F9_T68_DEPTH)

    # F9_s69 → F9_t70 (cut, symmetric)
    with BuildSketch(Plane.XY.offset(3.4)):
        with Locations((-45.72, 24.15)):
            Circle(F9_S69_R)
    extrude(amount=F9_T70_DEPTH, both=True, mode=Mode.SUBTRACT)


with BuildPart() as f9_tool71:
    # F9_s72 → F9_t73 (new body)
    with BuildSketch(Plane(origin=(-3.4244198855, -5.9312692281, 0), x_dir=(0, 0, 1), z_dir=(0.5, 0.8660254038, 0))):
        Polygon((2.75, -54.594681461), (4, -53.344681461), (4, -54.594681461), align=None)
    extrude(amount=F9_T73_DEPTH)

    # F9_s74 → F9_t75 (cut, symmetric)
    with BuildSketch(Plane.XY.offset(3.4)):
        with Locations((-45.72, 24.15)):
            Circle(F9_S74_R)
    extrude(amount=F9_T75_DEPTH, both=True, mode=Mode.SUBTRACT)


with BuildPart() as f9_tool76:
    # F9_s77 → F9_t78 (new body)
    with BuildSketch(Plane(origin=(1.4789333869, 2.5615877671, 0), x_dir=(0, 0, 1), z_dir=(-0.5, -0.8660254038, 0))):
        Polygon((2.75, 48.744681461), (4, 49.994681461), (4, 48.744681461), align=None)
    extrude(amount=F9_T78_DEPTH)

    # F9_s79 → F9_t80 (cut, symmetric)
    with BuildSketch(Plane.XY.offset(3.4)):
        with Locations((-45.72, 24.15)):
            Circle(F9_S79_R)
    extrude(amount=F9_T80_DEPTH, both=True, mode=Mode.SUBTRACT)


with BuildPart() as f9_tool81:
    # F9_s82 → F9_t83 (new body)
    with BuildSketch(Plane.YZ.offset(-40.8166467277)):
        Polygon((21.225, 2.75), (22.475, 4), (21.225, 4), align=None)
    extrude(amount=-F9_T83_DEPTH)

    # F9_s84 → F9_t85 (cut, symmetric)
    with BuildSketch(Plane.XY.offset(3.4)):
        with Locations((-45.72, 24.15)):
            Circle(F9_S84_R)
    extrude(amount=F9_T85_DEPTH, both=True, mode=Mode.SUBTRACT)


with BuildPart() as f9_tool86:
    # F9_s87 → F9_t88 (new body)
    with BuildSketch(Plane(origin=(-19.4355801145, 33.6634122329, 0), x_dir=(0, 0, 1), z_dir=(-0.5, 0.8660254038, 0))):
        Polygon((2.75, -30.444681461), (4, -29.194681461), (4, -30.444681461), align=None)
    extrude(amount=F9_T88_DEPTH)

    # F9_s89 → F9_t90 (cut, symmetric)
    with BuildSketch(Plane.XY.offset(3.4)):
        with Locations((-45.72, 24.15)):
            Circle(F9_S89_R)
    extrude(amount=F9_T90_DEPTH, both=True, mode=Mode.SUBTRACT)


with BuildPart() as f1_1:
    add(f1.part)

    # F9_t91: union F9_tool1, F9_tool6, F9_tool11, F9_tool16, F9_tool21, F9_tool26, F9_tool31, F9_tool36, F9_tool41, F9_tool46, F9_tool51, F9_tool56, F9_tool61, F9_tool66, F9_tool71, F9_tool76, F9_tool81, F9_tool86
    add([f9_tool1.part, f9_tool6.part, f9_tool11.part, f9_tool16.part, f9_tool21.part, f9_tool26.part, f9_tool31.part, f9_tool36.part, f9_tool41.part, f9_tool46.part, f9_tool51.part, f9_tool56.part, f9_tool61.part, f9_tool66.part, f9_tool71.part, f9_tool76.part, f9_tool81.part, f9_tool86.part])

    # F10 (on face) → F11 (cut)
    with BuildSketch(Plane.XY.offset(5)):
        Polygon((-43.0606951127, 47.225), (-47.9393048873, 47.225), (-50.3786097747, 43), (-47.9393048873, 38.775), (-43.0606951127, 38.775), (-40.6213902253, 43), align=None)
        Polygon((47.9393048873, 38.775), (50.3786097747, 43), (47.9393048873, 47.225), (43.0606951127, 47.225), (40.6213902253, 43), (43.0606951127, 38.775), align=None)
        Polygon((50.3786097747, -43), (47.9393048873, -38.775), (43.0606951127, -38.775), (40.6213902253, -43), (43.0606951127, -47.225), (47.9393048873, -47.225), align=None)
        Polygon((-50.3786097747, -43), (-47.9393048873, -47.225), (-43.0606951127, -47.225), (-40.6213902253, -43), (-43.0606951127, -38.775), (-47.9393048873, -38.775), align=None)
    extrude(amount=-F11_DEPTH, mode=Mode.SUBTRACT)


solid = f1_1.part
